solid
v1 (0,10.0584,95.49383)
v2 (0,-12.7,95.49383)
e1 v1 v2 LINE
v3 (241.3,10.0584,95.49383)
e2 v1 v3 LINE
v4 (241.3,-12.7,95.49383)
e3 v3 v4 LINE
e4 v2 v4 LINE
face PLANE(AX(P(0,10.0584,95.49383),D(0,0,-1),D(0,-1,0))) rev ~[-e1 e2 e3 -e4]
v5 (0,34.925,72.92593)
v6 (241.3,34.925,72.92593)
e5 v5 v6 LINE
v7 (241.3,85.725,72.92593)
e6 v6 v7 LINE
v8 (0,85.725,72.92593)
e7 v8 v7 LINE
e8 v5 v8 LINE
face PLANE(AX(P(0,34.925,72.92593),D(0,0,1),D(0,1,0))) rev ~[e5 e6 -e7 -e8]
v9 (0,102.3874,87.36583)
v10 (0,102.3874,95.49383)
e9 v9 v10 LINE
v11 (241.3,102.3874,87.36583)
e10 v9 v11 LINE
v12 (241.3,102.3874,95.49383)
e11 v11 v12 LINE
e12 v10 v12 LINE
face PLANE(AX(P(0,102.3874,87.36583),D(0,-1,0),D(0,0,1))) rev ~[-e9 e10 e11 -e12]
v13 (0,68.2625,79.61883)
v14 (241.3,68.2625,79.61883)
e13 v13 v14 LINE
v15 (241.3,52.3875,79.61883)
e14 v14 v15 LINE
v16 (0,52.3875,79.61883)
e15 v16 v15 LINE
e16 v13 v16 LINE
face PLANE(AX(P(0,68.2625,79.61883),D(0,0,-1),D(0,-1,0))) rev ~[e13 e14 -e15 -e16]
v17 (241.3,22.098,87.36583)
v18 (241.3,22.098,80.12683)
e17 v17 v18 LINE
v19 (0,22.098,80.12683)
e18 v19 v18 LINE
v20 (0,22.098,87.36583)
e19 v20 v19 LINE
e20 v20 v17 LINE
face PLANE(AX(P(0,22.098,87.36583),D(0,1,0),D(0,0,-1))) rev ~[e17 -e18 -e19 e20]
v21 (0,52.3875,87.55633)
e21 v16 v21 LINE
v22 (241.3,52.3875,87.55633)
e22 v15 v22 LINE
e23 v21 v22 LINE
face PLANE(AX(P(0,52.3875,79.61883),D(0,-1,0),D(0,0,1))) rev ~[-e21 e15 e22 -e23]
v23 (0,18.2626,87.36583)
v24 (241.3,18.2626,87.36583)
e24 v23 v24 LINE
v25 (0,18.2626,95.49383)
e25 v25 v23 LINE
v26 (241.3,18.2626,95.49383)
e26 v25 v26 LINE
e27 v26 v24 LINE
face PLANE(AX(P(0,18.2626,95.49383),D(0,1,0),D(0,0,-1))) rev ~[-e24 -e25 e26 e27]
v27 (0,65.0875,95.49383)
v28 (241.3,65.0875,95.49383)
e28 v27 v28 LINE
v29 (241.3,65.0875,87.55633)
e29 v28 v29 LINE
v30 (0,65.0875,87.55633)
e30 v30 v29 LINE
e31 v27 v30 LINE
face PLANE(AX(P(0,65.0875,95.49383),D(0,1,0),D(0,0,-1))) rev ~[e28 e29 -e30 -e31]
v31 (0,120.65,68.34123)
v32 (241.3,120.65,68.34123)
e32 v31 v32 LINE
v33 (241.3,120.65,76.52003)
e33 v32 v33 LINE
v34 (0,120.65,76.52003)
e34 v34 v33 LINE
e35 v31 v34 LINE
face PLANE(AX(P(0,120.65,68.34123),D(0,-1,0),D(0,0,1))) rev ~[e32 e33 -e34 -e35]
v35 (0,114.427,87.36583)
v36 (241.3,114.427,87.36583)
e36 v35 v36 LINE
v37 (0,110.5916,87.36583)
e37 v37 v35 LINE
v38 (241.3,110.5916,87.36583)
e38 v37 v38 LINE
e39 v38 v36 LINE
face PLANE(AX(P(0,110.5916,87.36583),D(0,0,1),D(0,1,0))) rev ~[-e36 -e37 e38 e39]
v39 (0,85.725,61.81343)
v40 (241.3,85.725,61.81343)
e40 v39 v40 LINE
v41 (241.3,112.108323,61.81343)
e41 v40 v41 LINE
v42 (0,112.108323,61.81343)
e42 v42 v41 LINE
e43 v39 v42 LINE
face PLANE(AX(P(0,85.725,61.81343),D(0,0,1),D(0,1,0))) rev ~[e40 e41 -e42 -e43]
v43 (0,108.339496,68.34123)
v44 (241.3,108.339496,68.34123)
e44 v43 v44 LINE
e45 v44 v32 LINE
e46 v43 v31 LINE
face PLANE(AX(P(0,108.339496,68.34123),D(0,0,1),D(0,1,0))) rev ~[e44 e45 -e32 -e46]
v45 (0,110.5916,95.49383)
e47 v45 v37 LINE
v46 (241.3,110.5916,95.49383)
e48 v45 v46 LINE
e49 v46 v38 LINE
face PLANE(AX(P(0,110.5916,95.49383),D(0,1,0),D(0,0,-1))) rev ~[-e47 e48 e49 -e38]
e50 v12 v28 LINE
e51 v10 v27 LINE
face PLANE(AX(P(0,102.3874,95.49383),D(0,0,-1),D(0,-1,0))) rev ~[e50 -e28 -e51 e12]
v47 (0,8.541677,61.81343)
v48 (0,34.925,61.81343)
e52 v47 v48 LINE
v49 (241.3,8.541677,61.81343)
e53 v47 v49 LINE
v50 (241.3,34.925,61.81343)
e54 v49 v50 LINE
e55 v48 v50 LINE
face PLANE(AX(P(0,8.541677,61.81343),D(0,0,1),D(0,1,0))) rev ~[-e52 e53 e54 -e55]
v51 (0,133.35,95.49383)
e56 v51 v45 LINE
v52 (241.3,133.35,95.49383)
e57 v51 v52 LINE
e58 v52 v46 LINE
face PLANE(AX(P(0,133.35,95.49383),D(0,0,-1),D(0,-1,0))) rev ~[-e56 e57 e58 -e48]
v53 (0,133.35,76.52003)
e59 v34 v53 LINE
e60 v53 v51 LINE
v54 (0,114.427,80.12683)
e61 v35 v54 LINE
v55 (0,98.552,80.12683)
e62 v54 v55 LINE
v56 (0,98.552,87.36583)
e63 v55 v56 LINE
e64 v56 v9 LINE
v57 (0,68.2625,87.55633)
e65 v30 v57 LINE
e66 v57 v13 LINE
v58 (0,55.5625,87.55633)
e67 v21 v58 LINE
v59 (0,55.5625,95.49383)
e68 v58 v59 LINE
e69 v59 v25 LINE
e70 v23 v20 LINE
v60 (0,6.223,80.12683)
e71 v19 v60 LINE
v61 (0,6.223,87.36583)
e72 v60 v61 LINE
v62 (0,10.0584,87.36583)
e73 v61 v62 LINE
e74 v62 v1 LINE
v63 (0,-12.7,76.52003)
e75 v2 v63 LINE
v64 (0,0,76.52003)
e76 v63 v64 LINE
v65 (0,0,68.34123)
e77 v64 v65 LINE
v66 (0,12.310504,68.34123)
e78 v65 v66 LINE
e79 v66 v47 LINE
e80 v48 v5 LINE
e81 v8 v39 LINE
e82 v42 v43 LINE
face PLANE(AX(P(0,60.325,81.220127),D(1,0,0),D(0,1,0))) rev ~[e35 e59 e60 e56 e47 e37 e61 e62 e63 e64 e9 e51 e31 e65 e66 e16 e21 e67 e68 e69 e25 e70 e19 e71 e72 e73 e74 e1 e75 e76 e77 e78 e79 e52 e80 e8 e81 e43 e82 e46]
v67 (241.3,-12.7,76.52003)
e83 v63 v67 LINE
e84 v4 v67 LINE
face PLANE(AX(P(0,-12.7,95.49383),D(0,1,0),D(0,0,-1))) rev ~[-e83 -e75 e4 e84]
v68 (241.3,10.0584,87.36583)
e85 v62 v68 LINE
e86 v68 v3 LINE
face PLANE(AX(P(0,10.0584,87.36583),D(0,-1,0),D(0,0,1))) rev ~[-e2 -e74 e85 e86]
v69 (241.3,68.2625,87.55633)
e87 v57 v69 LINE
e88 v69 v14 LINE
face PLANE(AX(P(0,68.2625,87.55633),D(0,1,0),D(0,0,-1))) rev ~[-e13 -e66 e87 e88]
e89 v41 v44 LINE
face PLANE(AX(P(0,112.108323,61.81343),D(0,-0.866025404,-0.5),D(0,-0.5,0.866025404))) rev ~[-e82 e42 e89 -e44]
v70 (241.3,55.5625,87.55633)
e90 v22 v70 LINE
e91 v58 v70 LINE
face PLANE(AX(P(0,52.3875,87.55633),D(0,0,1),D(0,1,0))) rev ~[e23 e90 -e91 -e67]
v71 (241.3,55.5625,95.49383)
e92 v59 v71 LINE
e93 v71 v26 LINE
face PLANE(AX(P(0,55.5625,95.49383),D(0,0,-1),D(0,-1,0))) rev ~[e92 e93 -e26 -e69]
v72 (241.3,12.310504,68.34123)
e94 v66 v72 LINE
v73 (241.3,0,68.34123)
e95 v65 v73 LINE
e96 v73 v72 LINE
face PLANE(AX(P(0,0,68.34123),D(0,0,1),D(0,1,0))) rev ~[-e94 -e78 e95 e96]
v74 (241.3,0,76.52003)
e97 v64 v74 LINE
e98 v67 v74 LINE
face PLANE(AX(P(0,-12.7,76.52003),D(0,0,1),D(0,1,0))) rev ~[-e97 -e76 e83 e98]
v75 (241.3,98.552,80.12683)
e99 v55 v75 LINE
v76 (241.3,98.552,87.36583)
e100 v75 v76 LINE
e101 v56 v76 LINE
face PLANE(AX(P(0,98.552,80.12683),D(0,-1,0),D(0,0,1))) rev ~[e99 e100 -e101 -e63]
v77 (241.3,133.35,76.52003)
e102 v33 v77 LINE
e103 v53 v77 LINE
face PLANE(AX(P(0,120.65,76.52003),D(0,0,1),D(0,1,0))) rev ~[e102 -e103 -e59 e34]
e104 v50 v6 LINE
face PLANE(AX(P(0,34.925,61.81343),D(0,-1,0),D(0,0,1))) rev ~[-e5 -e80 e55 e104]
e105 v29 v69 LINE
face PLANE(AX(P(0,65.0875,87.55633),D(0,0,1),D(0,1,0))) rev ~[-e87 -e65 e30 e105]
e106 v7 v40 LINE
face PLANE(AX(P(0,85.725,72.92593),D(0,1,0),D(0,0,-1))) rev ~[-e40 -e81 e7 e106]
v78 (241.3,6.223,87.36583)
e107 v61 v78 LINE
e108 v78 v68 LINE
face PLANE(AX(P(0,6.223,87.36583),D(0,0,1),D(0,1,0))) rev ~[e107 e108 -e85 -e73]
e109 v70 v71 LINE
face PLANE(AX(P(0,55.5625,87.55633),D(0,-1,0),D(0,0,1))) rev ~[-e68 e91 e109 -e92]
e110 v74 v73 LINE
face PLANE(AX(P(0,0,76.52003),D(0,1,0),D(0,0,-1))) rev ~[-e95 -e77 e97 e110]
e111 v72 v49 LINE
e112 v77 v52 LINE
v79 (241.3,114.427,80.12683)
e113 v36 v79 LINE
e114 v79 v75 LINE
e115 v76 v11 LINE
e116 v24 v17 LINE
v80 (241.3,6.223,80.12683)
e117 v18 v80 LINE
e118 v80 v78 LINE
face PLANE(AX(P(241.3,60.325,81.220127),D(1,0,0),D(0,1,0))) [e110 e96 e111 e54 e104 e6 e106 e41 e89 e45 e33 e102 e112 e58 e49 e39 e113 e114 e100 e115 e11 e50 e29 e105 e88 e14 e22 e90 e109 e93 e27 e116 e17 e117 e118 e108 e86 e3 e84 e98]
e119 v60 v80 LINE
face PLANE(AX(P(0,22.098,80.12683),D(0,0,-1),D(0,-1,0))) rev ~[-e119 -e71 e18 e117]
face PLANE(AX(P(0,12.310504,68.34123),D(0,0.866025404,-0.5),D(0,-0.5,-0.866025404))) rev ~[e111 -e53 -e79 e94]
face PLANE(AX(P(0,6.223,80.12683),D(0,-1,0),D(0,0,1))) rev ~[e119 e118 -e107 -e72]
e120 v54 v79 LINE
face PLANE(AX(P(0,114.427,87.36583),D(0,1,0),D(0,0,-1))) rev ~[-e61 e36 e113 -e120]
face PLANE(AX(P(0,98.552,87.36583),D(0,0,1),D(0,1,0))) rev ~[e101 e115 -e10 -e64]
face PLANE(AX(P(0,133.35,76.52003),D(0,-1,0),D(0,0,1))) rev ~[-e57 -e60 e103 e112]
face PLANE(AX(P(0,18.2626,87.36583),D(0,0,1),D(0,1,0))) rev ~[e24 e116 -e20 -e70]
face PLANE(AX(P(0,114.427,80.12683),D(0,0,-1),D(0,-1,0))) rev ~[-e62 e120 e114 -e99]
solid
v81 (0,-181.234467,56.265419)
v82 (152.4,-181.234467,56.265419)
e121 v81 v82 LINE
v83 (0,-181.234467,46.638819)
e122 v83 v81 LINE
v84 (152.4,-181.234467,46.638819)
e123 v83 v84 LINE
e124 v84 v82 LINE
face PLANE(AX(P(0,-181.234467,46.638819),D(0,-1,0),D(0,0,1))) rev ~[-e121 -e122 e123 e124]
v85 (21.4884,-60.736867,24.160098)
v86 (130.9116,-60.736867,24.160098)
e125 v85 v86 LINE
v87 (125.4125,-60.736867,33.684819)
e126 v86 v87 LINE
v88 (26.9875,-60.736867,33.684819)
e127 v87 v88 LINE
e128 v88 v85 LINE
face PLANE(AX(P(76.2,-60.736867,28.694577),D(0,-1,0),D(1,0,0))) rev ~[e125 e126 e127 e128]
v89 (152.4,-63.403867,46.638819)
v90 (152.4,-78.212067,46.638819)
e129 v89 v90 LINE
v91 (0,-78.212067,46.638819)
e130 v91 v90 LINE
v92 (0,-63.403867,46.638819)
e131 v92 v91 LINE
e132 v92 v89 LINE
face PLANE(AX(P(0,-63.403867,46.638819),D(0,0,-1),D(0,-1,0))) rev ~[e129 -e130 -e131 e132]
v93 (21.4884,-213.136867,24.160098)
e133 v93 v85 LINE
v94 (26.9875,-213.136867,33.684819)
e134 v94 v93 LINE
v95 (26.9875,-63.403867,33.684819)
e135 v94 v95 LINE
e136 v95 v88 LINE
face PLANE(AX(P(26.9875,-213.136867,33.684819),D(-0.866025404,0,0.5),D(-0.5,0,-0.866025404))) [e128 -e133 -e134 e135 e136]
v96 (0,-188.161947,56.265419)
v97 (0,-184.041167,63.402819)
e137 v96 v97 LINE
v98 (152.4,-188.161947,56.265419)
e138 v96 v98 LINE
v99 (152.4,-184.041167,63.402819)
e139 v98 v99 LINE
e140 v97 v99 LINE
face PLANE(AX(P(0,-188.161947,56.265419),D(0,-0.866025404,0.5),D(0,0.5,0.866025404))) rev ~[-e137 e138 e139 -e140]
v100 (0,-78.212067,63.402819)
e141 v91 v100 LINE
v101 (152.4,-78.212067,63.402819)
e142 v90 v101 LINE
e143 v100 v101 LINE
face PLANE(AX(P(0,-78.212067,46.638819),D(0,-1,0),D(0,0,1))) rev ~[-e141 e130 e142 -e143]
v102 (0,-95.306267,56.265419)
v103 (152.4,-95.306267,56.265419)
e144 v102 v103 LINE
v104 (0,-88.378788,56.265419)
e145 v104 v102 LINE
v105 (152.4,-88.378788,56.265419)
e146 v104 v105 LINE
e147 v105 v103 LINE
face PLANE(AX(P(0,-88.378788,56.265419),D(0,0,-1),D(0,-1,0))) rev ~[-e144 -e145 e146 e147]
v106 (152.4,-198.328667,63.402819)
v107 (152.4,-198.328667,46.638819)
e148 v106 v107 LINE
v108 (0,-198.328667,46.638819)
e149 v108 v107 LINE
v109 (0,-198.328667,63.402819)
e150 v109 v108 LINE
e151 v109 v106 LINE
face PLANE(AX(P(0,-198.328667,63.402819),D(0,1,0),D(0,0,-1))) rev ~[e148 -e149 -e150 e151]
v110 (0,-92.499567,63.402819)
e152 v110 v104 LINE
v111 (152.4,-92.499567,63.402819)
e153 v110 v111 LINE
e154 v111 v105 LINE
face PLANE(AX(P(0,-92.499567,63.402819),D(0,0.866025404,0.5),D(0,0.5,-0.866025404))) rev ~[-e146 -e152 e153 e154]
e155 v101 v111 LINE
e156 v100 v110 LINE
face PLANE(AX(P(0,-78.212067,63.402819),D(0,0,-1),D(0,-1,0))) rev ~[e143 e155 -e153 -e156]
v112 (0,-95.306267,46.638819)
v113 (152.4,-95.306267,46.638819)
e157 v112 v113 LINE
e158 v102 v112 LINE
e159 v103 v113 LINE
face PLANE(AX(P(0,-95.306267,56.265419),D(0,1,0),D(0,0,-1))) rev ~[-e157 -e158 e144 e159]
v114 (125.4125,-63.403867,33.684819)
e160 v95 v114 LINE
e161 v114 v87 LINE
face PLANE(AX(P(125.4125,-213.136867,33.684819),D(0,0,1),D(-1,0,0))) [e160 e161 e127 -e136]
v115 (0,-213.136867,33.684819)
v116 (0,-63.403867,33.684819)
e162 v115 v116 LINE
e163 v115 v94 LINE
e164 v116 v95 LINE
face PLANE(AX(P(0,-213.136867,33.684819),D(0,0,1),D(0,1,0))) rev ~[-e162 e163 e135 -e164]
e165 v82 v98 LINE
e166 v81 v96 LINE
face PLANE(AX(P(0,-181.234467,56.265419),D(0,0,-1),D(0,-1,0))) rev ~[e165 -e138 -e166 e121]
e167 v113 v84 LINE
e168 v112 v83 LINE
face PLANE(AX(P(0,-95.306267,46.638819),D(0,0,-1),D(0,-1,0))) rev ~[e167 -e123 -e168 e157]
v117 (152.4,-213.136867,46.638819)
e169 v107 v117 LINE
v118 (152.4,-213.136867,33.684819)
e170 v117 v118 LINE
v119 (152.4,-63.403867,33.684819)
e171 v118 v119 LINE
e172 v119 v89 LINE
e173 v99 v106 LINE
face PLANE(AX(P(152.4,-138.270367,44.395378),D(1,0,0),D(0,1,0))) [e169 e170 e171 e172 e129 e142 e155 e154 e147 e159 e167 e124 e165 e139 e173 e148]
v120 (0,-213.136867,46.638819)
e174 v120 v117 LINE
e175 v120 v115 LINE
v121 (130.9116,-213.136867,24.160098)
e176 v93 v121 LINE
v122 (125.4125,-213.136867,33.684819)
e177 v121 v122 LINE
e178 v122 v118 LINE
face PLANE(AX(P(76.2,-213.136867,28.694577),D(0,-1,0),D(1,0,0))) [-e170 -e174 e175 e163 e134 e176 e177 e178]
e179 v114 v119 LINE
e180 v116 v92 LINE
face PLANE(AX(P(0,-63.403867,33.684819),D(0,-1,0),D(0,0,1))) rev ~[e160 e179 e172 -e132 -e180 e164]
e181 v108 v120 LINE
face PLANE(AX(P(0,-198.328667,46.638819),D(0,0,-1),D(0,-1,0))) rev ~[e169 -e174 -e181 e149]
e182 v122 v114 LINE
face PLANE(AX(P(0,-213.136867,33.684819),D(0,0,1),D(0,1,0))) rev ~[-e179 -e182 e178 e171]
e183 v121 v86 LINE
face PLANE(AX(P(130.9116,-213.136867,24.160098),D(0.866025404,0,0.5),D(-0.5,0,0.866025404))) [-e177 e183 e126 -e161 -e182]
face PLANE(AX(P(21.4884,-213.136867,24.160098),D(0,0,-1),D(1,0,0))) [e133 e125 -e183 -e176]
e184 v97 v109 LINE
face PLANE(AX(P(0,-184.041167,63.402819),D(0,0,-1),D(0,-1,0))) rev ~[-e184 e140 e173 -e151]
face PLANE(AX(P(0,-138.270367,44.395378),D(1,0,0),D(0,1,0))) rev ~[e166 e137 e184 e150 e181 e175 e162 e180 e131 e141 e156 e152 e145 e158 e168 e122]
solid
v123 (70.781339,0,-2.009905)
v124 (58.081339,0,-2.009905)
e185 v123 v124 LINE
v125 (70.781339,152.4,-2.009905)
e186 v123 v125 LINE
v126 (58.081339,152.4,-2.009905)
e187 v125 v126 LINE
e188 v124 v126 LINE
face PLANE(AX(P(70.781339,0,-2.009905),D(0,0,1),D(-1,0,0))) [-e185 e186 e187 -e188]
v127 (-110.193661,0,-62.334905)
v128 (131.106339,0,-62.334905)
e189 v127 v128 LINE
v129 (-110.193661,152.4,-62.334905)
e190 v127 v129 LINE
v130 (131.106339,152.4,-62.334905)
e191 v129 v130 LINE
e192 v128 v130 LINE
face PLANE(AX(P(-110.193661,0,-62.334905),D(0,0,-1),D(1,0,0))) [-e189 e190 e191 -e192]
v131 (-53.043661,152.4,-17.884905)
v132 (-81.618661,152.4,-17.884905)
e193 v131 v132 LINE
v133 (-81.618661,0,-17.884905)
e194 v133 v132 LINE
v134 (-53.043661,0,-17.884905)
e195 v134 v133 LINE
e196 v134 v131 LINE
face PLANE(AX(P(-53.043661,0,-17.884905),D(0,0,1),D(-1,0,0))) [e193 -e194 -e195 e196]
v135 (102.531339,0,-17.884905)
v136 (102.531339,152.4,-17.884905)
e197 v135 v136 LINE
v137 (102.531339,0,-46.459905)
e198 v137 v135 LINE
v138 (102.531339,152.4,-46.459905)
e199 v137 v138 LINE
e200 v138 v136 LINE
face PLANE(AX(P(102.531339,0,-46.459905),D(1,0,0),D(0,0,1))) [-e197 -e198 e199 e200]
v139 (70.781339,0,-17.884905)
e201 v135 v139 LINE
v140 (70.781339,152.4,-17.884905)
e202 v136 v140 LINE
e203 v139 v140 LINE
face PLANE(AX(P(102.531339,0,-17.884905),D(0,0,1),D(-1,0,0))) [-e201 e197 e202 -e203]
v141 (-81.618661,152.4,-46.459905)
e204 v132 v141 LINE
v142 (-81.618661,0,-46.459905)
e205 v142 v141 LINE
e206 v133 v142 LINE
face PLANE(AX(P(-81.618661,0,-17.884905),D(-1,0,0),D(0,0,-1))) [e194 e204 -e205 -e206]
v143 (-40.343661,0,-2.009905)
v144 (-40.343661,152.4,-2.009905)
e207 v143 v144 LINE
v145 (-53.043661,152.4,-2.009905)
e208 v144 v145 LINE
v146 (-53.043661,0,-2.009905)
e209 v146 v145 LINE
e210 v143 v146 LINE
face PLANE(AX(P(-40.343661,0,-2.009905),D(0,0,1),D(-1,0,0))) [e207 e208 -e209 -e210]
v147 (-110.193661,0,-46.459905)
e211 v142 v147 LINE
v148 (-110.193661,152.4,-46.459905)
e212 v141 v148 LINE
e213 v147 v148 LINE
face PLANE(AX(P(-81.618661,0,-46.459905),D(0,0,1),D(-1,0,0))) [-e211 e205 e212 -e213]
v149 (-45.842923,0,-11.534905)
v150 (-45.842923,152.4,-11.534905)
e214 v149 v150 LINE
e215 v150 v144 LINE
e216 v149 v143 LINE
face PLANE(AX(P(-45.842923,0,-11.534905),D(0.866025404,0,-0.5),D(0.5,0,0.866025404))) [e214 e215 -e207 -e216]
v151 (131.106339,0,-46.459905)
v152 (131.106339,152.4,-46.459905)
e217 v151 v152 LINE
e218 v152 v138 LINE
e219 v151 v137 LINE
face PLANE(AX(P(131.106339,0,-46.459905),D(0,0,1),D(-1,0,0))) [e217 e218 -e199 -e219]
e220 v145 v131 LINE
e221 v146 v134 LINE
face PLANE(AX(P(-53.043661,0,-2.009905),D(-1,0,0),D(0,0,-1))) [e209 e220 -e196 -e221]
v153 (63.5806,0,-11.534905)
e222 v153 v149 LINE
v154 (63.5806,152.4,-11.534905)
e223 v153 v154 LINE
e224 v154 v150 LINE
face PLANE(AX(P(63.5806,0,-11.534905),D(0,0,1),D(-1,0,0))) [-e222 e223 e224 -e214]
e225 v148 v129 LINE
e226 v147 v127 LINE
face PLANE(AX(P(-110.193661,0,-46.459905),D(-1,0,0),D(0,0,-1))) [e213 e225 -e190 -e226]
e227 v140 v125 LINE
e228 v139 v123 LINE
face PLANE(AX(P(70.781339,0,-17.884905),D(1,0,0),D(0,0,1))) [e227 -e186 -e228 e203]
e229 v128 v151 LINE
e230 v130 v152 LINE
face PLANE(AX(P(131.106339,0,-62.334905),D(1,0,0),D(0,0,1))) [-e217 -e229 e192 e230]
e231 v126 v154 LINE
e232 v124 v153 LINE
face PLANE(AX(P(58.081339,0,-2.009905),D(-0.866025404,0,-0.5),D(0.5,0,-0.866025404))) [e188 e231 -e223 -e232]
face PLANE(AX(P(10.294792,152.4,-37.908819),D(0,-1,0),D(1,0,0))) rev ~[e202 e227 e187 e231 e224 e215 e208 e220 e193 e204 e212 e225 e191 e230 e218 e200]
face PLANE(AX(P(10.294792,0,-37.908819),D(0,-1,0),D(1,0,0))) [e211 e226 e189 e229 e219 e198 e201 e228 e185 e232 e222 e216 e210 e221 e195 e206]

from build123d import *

# Parameters (mm, degrees)
F1_DEPTH = 152.4
F3_DEPTH = 241.3
F5_DEPTH = 152.4
F7_DEPTH = 152.4


with BuildPart() as f1:
    # F0 (on Front) → F1 (new body)
    with BuildSketch(Plane.XZ):
        Polygon((-110.1936613465, -46.4599046108), (-110.1936613465, -62.3349046108), (131.1063386535, -62.3349046108), (131.1063386535, -46.4599046108), (102.5313386535, -46.4599046108), (102.5313386535, -17.8849046108), (70.7813386535, -17.8849046108), (70.7813386535, -2.0099046108), (58.0813386535, -2.0099046108), (63.5805999675, -11.5349046108), (-45.8429226605, -11.5349046108), (-40.3436613465, -2.0099046108), (-53.0436613465, -2.0099046108), (-53.0436613465, -17.8849046108), (-81.6186613465, -17.8849046108), (-81.6186613465, -46.4599046108), align=None)
    extrude(amount=-F1_DEPTH)


with BuildPart() as f3:
    # F2 (on Right) → F3 (new body)
    with BuildSketch(Plane.YZ):
        Polygon((12.3105041872, 68.34122984), (8.5416771, 61.81342984), (34.925, 61.81342984), (34.925, 72.92592984), (85.725, 72.92592984), (85.725, 61.81342984), (112.1083229, 61.81342984), (108.3394958128, 68.34122984), (120.65, 68.34122984), (120.65, 76.52002984), (133.35, 76.52002984), (133.35, 95.49382984), (110.5916, 95.49382984), (110.5916, 87.36582984), (114.427, 87.36582984), (114.427, 80.12682984), (98.552, 80.12682984), (98.552, 87.36582984), (102.3874, 87.36582984), (102.3874, 95.49382984), (65.0875, 95.49382984), (65.0875, 87.55632984), (68.2625, 87.55632984), (68.2625, 79.61882984), (52.3875, 79.61882984), (52.3875, 87.55632984), (55.5625, 87.55632984), (55.5625, 95.49382984), (18.2626, 95.49382984), (18.2626, 87.36582984), (22.098, 87.36582984), (22.098, 80.12682984), (6.223, 80.12682984), (6.223, 87.36582984), (10.0584, 87.36582984), (10.0584, 95.49382984), (-12.7, 95.49382984), (-12.7, 76.52002984), (0, 76.52002984), (0, 68.34122984), align=None)
    extrude(amount=F3_DEPTH)


with BuildPart() as f5:
    # F4 (on Right) → F5 (new body)
    with BuildSketch(Plane.YZ):
        Polygon((-213.1368674653, 46.6388186438), (-213.1368674653, 33.6848186438), (-63.4038674653, 33.6848186438), (-63.4038674653, 46.6388186438), (-78.2120674653, 46.6388186438), (-78.2120674653, 63.4028186438), (-92.4995674653, 63.4028186438), (-88.378787654, 56.2654186438), (-95.3062674653, 56.2654186438), (-95.3062674653, 46.6388186438), (-181.2344674653, 46.6388186438), (-181.2344674653, 56.2654186438), (-188.1619472766, 56.2654186438), (-184.0411674653, 63.4028186438), (-198.3286674653, 63.4028186438), (-198.3286674653, 46.6388186438), align=None)
    extrude(amount=F5_DEPTH)

    # F6 (on face) → F7 (join)
    with BuildSketch(Plane.XZ.offset(213.1368674653)):
        Polygon((125.4125, 33.6848186438), (26.9875, 33.6848186438), (21.4884, 24.1600980479), (130.9116, 24.1600980479), align=None)
    extrude(amount=-F7_DEPTH)


solid = Compound([f1.part, f3.part, f5.part])
